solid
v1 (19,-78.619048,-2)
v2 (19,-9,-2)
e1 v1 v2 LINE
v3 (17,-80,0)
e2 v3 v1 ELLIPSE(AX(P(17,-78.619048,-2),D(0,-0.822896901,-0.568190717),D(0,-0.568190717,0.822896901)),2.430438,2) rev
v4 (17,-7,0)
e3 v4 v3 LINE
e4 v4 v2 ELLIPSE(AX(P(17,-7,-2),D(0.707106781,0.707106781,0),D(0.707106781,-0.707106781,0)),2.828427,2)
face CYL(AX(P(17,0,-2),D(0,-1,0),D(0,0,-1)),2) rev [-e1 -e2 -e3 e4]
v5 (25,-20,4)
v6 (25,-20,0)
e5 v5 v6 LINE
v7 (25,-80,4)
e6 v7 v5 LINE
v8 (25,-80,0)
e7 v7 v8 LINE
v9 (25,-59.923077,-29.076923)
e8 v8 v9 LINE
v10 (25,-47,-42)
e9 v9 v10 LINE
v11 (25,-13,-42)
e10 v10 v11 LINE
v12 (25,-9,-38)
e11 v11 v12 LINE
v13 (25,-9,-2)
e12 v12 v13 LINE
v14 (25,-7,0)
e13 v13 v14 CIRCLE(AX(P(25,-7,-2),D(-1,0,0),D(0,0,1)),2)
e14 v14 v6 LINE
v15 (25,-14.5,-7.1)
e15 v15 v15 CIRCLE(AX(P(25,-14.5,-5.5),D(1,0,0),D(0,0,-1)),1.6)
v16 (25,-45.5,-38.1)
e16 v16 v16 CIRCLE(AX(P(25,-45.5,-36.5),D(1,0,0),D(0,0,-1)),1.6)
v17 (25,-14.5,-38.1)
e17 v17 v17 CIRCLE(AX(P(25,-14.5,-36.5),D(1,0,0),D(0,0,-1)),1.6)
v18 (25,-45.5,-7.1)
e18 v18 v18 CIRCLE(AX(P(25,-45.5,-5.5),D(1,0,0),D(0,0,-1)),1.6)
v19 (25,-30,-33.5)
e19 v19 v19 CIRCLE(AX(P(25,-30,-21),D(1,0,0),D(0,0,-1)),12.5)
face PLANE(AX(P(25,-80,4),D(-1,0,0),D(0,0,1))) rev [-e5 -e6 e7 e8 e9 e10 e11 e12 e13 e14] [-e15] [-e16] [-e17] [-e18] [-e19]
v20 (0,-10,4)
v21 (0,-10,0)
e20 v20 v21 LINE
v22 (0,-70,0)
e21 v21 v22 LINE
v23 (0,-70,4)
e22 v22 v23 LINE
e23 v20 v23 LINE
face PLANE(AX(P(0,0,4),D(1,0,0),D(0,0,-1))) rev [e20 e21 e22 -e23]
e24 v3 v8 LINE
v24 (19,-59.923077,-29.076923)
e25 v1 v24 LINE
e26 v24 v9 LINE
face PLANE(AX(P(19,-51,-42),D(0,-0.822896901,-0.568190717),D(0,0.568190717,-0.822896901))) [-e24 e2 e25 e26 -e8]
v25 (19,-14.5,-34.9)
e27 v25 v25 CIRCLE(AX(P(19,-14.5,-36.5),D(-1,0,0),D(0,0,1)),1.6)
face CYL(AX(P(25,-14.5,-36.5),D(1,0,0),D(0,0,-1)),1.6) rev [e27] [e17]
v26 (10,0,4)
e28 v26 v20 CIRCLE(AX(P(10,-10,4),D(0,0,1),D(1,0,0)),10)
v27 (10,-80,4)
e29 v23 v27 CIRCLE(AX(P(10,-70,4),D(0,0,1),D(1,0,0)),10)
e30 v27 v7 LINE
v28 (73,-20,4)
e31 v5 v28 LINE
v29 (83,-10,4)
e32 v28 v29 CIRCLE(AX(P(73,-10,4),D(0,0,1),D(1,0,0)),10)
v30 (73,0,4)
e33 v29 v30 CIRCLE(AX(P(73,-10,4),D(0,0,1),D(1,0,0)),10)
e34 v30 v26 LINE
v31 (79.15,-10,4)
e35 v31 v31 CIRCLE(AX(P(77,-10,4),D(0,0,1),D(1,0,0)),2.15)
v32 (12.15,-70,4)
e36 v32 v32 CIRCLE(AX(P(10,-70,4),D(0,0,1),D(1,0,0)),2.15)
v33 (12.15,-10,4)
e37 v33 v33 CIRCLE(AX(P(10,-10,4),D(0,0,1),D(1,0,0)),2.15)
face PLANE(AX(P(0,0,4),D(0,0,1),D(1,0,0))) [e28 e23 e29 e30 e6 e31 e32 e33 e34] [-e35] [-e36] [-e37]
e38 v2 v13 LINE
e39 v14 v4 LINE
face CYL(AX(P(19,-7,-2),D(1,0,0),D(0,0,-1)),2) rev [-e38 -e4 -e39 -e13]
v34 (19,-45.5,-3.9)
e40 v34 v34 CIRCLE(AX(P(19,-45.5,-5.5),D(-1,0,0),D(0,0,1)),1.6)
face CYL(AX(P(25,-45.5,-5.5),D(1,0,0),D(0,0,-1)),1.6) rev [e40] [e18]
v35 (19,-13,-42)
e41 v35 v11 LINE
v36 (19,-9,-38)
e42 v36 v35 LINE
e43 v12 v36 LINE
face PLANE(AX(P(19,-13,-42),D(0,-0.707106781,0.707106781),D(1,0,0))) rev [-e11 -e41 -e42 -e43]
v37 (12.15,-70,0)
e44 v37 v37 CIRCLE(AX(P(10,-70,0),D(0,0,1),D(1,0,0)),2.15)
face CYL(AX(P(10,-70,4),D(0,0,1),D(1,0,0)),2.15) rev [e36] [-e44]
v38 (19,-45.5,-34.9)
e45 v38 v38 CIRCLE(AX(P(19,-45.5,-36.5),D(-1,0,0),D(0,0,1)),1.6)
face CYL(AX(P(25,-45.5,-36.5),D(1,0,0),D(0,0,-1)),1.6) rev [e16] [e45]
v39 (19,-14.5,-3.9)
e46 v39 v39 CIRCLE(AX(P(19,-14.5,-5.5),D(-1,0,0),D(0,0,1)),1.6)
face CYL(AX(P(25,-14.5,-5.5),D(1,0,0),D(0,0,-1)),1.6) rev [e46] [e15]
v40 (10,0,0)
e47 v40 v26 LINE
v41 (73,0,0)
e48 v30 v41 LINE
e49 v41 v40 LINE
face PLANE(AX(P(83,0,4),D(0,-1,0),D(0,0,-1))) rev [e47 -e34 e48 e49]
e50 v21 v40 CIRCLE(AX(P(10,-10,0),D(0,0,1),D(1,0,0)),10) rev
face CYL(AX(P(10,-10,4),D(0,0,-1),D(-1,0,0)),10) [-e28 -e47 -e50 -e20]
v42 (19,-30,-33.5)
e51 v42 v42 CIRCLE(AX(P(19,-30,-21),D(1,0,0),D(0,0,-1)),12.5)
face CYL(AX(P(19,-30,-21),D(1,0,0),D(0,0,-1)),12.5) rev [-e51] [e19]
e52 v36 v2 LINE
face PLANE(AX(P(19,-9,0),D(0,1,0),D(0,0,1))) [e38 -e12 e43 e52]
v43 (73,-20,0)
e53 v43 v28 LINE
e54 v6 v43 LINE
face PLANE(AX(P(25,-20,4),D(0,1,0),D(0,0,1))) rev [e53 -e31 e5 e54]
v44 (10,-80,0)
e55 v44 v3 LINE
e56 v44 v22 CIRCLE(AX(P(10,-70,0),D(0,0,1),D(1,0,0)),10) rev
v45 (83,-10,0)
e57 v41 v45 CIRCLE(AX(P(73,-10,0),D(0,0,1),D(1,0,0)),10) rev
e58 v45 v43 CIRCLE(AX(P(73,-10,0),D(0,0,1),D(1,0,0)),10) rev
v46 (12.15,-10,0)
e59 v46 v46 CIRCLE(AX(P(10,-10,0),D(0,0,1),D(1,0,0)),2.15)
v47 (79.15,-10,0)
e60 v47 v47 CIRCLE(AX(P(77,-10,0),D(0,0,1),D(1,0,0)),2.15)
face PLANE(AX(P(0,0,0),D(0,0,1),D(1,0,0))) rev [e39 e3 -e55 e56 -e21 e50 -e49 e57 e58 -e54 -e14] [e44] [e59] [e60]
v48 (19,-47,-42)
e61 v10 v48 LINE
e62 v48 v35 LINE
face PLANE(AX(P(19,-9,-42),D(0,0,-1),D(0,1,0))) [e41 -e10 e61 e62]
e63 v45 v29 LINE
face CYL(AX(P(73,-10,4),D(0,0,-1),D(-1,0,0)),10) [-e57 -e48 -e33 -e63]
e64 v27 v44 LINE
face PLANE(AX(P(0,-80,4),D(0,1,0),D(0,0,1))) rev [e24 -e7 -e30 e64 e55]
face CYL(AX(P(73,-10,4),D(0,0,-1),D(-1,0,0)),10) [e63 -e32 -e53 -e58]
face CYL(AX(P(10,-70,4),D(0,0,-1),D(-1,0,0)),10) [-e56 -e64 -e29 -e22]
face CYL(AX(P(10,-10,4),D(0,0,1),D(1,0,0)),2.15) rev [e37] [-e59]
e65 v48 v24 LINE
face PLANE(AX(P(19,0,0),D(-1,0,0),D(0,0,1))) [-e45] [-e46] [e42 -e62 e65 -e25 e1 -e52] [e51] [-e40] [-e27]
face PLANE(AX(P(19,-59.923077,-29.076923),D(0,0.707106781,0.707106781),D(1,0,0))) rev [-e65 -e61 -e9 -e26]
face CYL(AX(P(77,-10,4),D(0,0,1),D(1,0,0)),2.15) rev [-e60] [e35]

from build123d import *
from OCP.BRepFilletAPI import BRepFilletAPI_MakeChamfer

# Parameters (mm, degrees)
BOSS_EXTRU_1_DEPTH   = 4
ESQUISSE3_R          = 12.5
BOSS_EXTRU_2_DEPTH   = 6
D_GAGEMENT_M31_D     = 3.2
D_GAGEMENT_M41_D     = 4.3
D_GAGEMENT_M41_DEPTH = 15
CONG_1_R             = 2
CHANFREIN1_SIZE      = 4
CHANFREIN1_SIZE2     = 15.704369422
CONG_2_R             = 10


with BuildPart() as part:
    # Esquisse1 → Boss.-Extru.1 (new body)
    with BuildSketch(Plane.XY):
        Polygon((0, 0), (0, -80), (25, -80), (25, -20), (83, -20), (83, 0), align=None)
    extrude(amount=BOSS_EXTRU_1_DEPTH)

    # Esquisse3 → Boss.-Extru.2 (add)
    with BuildSketch(Plane(origin=(25, 0, 0), x_dir=(0, 0, -1), z_dir=(1, 0, 0))):
        Polygon((0, -9), (42, -9), (42, -51), (0, -80), align=None)
        with Locations((21, -30)):
            Circle(ESQUISSE3_R, mode=Mode.SUBTRACT)
    extrude(amount=-BOSS_EXTRU_2_DEPTH)

    # Dégagement M31 (through all)
    with Locations(Plane(origin=(25, 0, 0), x_dir=(0, 0, -1), z_dir=(1, 0, 0))):
        with Locations((5.5, -14.5), (36.5, -14.5), (36.5, -45.5), (5.5, -45.5)):
            Hole(D_GAGEMENT_M31_D / 2)

    # Dégagement M41
    with Locations(Plane.XY.offset(4)):
        with Locations((10, -10), (10, -70), (77, -10)):
            Hole(D_GAGEMENT_M41_D / 2, depth=D_GAGEMENT_M41_DEPTH)

    # Congé1
    cong_1_edges = [part.edges().sort_by_distance(p)[0] for p in [
        (19, -44.5, 0),
        (22, -9, 0),
    ]]
    fillet(cong_1_edges, radius=CONG_1_R)

    # Chanfrein1: one chamfer whose edges measure the first distance from different faces: ONE call of the kernel's chamfer builder (chamfer() names one face for all edges)
    chanfrein1_edges_1 = [part.edges().sort_by_distance(p)[0] for p in [
        (22, -9, -42),
    ]]
    chanfrein1_edges_2 = [part.edges().sort_by_distance(p)[0] for p in [
        (22, -51, -42),
    ]]
    chanfrein1_side_2 = [part.faces().sort_by_distance(p)[0] for p in [
        (22, -30, -42),
    ]]
    chanfrein1 = BRepFilletAPI_MakeChamfer(part.part.solid().wrapped)
    for e in chanfrein1_edges_1:
        chanfrein1.Add(CHANFREIN1_SIZE, e.wrapped)
    for e in chanfrein1_edges_2:
        chanfrein1.Add(CHANFREIN1_SIZE, CHANFREIN1_SIZE2, e.wrapped, chanfrein1_side_2[0].wrapped)  # the first distance lies on this face
    add(Compound.cast(chanfrein1.Shape()), mode=Mode.REPLACE)

    # Congé2
    cong_2_edges = [part.edges().sort_by_distance(p)[0] for p in [
        (83, -20, 2),
        (0, -80, 2),
        (0, 0, 2),
        (83, 0, 2),
    ]]
    fillet(cong_2_edges, radius=CONG_2_R - 0.0001)  # a hair under: the kernel refuses the full size


solid = part.part
